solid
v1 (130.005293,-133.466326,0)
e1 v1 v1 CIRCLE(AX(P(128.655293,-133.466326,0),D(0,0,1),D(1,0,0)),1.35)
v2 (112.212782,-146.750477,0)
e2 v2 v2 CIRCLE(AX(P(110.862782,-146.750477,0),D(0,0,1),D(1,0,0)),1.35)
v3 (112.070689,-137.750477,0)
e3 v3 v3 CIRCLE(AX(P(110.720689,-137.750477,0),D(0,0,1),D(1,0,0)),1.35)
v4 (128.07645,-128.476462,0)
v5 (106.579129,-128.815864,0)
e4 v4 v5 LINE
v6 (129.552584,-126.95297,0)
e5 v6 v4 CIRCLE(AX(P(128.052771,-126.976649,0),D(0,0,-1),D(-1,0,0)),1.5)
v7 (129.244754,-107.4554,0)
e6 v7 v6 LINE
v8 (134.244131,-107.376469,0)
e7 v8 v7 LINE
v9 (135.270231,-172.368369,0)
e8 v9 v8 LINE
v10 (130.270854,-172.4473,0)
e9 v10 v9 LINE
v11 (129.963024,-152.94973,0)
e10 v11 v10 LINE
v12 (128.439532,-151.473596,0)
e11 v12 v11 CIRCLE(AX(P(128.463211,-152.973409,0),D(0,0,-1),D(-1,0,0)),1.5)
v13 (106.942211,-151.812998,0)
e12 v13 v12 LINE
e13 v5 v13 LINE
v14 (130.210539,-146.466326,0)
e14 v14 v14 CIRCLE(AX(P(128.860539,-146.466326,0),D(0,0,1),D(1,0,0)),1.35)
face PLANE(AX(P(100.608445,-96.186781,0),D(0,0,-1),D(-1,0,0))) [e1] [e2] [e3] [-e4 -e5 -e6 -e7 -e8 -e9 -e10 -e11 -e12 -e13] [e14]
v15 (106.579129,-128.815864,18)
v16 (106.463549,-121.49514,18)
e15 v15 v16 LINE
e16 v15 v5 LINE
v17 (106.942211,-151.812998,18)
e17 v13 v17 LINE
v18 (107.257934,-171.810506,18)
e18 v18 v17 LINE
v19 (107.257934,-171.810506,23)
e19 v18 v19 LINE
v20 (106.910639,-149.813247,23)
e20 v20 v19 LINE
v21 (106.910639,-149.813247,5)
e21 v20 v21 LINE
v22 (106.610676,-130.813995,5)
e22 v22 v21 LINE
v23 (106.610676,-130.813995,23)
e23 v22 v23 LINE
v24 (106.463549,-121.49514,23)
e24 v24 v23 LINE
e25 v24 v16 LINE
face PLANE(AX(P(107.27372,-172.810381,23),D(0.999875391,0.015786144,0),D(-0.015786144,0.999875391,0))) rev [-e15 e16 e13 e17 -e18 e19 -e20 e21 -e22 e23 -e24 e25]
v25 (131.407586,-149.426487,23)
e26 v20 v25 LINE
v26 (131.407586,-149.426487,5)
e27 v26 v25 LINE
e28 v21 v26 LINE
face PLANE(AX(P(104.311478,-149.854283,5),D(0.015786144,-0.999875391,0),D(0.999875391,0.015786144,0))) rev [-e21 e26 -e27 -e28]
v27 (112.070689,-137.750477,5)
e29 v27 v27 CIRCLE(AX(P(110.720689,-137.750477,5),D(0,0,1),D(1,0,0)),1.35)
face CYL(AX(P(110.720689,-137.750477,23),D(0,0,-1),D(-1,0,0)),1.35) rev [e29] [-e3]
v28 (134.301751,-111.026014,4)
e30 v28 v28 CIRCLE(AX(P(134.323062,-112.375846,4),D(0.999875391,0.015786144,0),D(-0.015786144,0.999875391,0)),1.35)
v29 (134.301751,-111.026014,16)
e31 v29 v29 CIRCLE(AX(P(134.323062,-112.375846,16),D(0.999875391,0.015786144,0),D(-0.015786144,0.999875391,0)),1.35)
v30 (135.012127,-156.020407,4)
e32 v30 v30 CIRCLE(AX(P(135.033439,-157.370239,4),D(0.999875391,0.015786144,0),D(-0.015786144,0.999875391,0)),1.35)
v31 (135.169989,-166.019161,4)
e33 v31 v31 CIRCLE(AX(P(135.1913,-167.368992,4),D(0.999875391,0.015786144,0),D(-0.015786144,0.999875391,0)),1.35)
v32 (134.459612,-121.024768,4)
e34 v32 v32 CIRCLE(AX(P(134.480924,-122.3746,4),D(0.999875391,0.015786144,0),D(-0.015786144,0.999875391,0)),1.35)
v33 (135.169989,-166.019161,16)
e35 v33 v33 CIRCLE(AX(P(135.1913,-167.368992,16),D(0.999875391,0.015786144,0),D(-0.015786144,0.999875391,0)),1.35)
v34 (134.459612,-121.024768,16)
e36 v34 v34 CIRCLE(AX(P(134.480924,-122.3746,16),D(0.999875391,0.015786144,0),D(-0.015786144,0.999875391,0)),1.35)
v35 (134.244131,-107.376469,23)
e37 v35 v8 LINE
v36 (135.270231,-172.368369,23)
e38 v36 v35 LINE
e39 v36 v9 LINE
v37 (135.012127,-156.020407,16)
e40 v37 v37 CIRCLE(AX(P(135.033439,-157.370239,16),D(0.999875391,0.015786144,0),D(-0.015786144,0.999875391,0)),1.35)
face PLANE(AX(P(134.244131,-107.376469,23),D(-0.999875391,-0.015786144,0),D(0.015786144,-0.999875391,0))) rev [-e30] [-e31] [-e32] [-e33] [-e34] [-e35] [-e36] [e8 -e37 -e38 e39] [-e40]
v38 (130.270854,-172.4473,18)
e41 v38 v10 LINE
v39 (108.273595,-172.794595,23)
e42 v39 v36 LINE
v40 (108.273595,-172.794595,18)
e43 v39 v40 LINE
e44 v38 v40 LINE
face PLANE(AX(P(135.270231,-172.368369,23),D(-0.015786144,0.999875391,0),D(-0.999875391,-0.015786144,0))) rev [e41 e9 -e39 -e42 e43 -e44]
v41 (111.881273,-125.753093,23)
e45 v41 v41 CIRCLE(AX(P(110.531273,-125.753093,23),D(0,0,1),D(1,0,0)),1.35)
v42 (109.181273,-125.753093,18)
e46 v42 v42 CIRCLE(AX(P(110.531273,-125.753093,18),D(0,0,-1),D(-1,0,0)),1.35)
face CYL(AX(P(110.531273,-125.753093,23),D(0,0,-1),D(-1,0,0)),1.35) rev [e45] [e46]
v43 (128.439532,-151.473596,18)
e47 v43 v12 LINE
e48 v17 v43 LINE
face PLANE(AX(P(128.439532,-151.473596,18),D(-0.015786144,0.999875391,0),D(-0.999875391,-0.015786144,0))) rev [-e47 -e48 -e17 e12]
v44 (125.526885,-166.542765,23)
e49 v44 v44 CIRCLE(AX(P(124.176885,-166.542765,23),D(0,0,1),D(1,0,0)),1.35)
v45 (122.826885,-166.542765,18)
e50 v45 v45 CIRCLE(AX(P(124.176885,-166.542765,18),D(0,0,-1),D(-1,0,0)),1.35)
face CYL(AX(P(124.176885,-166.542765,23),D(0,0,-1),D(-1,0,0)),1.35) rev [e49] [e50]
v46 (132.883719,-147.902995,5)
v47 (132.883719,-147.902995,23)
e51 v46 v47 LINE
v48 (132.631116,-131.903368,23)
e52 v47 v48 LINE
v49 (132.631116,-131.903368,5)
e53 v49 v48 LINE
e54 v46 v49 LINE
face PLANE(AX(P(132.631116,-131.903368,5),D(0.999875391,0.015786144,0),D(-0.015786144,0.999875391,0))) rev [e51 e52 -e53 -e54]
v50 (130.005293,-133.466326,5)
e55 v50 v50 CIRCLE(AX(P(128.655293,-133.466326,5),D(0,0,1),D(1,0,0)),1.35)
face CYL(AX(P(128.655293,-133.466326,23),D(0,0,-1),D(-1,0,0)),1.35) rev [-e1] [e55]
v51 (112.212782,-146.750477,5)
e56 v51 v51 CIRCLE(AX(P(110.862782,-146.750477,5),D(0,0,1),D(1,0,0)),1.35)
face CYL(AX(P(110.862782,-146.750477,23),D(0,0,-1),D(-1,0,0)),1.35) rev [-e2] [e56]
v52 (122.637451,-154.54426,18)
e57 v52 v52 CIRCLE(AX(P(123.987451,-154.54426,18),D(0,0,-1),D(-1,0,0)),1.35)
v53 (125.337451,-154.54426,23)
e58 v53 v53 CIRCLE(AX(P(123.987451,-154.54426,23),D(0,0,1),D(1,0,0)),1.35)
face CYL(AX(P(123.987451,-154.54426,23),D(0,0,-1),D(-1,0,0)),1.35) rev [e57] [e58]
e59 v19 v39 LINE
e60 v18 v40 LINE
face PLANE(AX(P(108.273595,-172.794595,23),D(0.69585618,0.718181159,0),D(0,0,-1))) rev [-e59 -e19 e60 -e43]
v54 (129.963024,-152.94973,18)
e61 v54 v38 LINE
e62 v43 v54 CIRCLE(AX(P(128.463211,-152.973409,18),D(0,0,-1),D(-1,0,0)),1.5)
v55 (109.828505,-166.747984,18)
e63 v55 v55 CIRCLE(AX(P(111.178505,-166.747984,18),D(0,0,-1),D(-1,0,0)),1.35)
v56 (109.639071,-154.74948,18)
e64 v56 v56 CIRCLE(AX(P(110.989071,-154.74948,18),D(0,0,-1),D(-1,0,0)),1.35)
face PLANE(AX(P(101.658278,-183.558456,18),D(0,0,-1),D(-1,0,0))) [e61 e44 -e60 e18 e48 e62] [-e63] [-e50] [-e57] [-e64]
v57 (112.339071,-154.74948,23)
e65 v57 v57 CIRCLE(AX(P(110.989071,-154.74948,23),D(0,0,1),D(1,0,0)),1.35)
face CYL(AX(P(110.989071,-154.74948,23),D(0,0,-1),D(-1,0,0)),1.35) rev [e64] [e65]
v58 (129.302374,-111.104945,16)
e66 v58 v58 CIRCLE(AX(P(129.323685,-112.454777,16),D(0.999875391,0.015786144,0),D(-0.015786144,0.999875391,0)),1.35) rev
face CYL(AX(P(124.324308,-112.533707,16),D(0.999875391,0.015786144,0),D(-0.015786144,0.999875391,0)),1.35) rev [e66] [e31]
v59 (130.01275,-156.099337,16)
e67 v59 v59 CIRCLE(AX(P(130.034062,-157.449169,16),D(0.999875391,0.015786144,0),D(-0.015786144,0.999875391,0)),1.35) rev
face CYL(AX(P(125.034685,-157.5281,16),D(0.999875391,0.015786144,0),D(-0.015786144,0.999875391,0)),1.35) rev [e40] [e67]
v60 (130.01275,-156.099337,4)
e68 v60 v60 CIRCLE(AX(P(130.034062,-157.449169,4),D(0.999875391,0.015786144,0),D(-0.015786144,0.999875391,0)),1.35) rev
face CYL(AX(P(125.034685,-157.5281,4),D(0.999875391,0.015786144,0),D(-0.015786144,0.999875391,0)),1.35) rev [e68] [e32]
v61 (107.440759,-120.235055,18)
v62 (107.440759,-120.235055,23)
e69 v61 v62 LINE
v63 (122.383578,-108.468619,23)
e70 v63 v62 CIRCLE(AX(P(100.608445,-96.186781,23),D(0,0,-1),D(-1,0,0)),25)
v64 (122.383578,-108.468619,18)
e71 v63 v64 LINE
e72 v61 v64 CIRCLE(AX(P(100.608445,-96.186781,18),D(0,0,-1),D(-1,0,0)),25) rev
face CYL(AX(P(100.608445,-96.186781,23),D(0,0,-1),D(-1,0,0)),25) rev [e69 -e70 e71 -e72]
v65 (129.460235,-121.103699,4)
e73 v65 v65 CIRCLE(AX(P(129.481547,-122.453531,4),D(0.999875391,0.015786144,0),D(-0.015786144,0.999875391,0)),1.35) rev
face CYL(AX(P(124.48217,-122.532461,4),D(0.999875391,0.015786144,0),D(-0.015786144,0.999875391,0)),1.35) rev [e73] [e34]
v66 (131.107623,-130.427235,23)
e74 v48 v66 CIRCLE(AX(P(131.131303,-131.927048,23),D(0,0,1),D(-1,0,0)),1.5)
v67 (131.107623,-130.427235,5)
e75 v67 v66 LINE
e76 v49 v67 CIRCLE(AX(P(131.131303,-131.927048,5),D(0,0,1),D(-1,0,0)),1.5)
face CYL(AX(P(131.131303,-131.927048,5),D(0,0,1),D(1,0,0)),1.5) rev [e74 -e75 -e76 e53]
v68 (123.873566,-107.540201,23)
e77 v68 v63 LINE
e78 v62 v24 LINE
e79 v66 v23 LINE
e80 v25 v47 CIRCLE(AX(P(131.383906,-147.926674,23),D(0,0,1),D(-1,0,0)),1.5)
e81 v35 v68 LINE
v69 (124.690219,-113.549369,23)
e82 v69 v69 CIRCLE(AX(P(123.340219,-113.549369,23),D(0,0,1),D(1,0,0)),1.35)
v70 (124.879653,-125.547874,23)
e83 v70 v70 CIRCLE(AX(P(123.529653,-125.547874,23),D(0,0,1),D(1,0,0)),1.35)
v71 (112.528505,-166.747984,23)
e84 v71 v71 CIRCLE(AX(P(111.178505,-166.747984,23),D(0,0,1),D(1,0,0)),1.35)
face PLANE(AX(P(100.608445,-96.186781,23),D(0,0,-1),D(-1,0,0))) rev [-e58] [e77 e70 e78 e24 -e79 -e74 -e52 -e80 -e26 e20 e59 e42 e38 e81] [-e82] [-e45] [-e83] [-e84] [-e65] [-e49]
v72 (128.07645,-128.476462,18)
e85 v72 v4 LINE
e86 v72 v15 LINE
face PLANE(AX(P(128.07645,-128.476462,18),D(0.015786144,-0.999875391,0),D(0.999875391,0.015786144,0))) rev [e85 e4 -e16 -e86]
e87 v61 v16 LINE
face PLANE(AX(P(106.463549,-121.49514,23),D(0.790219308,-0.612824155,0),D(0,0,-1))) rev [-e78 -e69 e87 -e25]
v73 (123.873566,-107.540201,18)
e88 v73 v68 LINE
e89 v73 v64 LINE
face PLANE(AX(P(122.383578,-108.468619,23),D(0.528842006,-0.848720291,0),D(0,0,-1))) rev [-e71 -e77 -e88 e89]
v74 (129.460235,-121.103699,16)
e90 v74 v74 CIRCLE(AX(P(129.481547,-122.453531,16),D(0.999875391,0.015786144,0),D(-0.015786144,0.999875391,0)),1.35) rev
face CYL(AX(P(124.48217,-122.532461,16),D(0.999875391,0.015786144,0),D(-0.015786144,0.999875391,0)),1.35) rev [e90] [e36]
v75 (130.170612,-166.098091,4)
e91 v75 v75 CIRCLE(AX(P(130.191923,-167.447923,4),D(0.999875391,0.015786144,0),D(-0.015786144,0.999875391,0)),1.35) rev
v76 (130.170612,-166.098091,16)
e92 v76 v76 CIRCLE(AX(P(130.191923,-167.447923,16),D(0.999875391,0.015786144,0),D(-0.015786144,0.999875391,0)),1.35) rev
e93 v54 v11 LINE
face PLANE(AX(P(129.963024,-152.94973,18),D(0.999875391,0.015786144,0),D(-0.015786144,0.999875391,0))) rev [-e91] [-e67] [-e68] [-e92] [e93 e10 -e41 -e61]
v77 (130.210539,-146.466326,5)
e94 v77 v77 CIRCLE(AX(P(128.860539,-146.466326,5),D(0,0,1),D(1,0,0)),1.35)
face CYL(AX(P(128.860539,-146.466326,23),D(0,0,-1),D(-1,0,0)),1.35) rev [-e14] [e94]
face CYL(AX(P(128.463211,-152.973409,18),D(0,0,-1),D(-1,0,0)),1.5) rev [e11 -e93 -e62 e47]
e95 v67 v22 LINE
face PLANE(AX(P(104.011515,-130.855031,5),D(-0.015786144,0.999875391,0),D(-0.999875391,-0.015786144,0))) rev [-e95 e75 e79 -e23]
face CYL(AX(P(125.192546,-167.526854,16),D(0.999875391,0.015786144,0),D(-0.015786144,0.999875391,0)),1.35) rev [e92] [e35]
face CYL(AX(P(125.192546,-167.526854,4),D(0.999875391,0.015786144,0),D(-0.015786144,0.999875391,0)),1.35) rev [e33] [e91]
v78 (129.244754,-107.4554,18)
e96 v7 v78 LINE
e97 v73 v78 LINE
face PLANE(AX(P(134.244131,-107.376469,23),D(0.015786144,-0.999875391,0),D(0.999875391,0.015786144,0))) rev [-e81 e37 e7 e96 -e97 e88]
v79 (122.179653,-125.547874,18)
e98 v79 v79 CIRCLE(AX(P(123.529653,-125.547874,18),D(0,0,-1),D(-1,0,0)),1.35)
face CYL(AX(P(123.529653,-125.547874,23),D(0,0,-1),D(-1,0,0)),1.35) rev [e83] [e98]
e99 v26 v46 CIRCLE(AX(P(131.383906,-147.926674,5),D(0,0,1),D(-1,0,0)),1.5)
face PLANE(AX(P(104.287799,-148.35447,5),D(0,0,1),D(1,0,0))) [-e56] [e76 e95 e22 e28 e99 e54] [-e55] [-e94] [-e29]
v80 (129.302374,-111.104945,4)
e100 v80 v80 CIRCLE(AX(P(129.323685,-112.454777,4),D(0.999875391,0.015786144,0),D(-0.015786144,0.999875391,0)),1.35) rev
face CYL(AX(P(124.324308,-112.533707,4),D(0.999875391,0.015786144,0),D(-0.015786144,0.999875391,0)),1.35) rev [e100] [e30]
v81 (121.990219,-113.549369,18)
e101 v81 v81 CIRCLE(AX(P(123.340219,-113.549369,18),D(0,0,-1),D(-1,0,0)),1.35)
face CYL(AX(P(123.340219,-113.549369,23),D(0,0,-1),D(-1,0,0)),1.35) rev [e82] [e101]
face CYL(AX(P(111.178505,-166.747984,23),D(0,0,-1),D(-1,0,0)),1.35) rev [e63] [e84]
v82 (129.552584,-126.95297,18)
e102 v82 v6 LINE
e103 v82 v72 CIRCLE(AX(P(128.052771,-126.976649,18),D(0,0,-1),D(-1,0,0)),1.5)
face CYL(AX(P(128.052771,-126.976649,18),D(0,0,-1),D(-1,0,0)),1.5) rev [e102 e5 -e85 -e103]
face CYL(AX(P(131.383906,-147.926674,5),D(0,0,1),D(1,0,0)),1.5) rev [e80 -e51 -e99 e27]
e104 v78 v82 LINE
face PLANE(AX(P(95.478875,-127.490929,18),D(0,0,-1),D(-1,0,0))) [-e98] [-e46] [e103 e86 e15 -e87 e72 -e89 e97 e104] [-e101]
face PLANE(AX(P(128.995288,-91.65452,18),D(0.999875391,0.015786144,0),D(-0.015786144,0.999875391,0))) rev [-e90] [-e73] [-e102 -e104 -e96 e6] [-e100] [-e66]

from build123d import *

# Parameters (mm, degrees)
SKETCH1_R          = 1.35
EXTRUDE1_DEPTH     = 23
SKETCH2_R          = 1.35
CUT_EXTRUDE1_DEPTH = 10
CHAMFER3_SIZE      = 1
EXTRUDE2_DEPTH     = 18
EXTRUDE3_DEPTH     = 18


with BuildPart() as part:
    # Sketch1 → Extrude1 (new body)
    with BuildSketch(Plane.XY):
        with BuildLine():
            Line((134.244131426, -107.376468954), (135.270230766, -172.368369374))
            Line((135.270230766, -172.368369374), (107.273719816, -172.810381397))
            Line((107.273719816, -172.810381397), (106.44776294, -120.495264366))
            ThreePointArc((106.44776294, -120.495264366), (116.078507859, -115.825445612), (122.873690334, -107.555986741))
            Line((122.873690334, -107.555986741), (134.244131426, -107.376468954))
        make_face()
        with Locations((110.720688645, -137.750476655)):
            Circle(SKETCH1_R, mode=Mode.SUBTRACT)
        with Locations((111.178504518, -166.747984476)):
            Circle(SKETCH1_R, mode=Mode.SUBTRACT)
        with Locations((124.176884602, -166.542764608)):
            Circle(SKETCH1_R, mode=Mode.SUBTRACT)
        with Locations((123.987450878, -154.544259915)):
            Circle(SKETCH1_R, mode=Mode.SUBTRACT)
        with Locations((110.989070794, -154.749479783)):
            Circle(SKETCH1_R, mode=Mode.SUBTRACT)
        with Locations((123.529652711, -125.547873574)):
            Circle(SKETCH1_R, mode=Mode.SUBTRACT)
        with Locations((110.531272627, -125.753093442)):
            Circle(SKETCH1_R, mode=Mode.SUBTRACT)
        with Locations((123.340218986, -113.549368881)):
            Circle(SKETCH1_R, mode=Mode.SUBTRACT)
        with Locations((128.65529324, -133.466326068)):
            Circle(SKETCH1_R, mode=Mode.SUBTRACT)
        with Locations((110.862781644, -146.750476655)):
            Circle(SKETCH1_R, mode=Mode.SUBTRACT)
        with Locations((128.860538683, -146.466326068)):
            Circle(SKETCH1_R, mode=Mode.SUBTRACT)
    extrude(amount=EXTRUDE1_DEPTH)

    # Sketch2 → Cut-Extrude1 (cut)
    with BuildSketch(Plane(origin=(132.515828327, 2.092174611, 0), x_dir=(0, 0, -1), z_dir=(0.9998753910699589, 0.01578614369301875, 0))):
        with Locations(Location((-16, -114.482286036, 0), (0, 0, 90))):
            Circle(SKETCH2_R)
        with Locations(Location((-4, -114.482286036, 0), (0, 0, 90))):
            Circle(SKETCH2_R)
        with Locations(Location((-16, -124.482286036, 0), (0, 0, 90))):
            Circle(SKETCH2_R)
        with Locations(Location((-4, -124.482286036, 0), (0, 0, 90))):
            Circle(SKETCH2_R)
        with Locations(Location((-16, -169.482286036, 0), (0, 0, 90))):
            Circle(SKETCH2_R)
        with Locations(Location((-4, -169.482286036, 0), (0, 0, 90))):
            Circle(SKETCH2_R)
        with Locations(Location((-16, -159.482286036, 0), (0, 0, 90))):
            Circle(SKETCH2_R)
        with Locations(Location((-4, -159.482286036, 0), (0, 0, 90))):
            Circle(SKETCH2_R)
    extrude(amount=-CUT_EXTRUDE1_DEPTH, mode=Mode.SUBTRACT)

    # Chamfer3
    # the kernel refuses this chamfer: 1 mm, written as the material it takes off along each edge
    with BuildSketch(Plane(origin=(107.273719816, -172.810381397, -2.571682988), x_dir=(-0.01578614369302038, 0.9998753910699589, 0), z_dir=(0, 0, 1))) as chamfer3_piece_1:
        Polygon((CHAMFER3_SIZE, 0), (0, -CHAMFER3_SIZE), (0, 0), align=None)
    extrude(amount=28.143365976, mode=Mode.SUBTRACT)
    with BuildSketch(Plane(origin=(106.44776294, -120.495264366, -2.646322056), x_dir=(0.9673390331642948, 0.2534860842665082, 0), z_dir=(0, 0, 1))) as chamfer3_piece_2:
        with BuildLine():
            Line((1.026523691, 0), (-CHAMFER3_SIZE * 0.238183944659, -CHAMFER3_SIZE * 0.971220061833))
            Line((-CHAMFER3_SIZE * 0.238183944659, -CHAMFER3_SIZE * 0.971220061833), (0, 0))
            ThreePointArc((0, 0), (0.529135289, -0.00526427), (1.026523691, 0))
        make_face()
    extrude(amount=28.292644112, mode=Mode.SUBTRACT)
    with BuildSketch(Plane(origin=(122.873690334, -107.555986741, -2.676981296), x_dir=(0.9998753910699592, 0.015786143693006172, 0), z_dir=(0, 0, 1))) as chamfer3_piece_3:
        with BuildLine():
            Line((CHAMFER3_SIZE, 0), (-0.504457815, -0.904781971))
            ThreePointArc((-0.504457815, -0.904781971), (-0.256001011, -0.470163527), (0, 0))
            Line((0, 0), (CHAMFER3_SIZE, 0))
        make_face()
    extrude(amount=28.353962591, mode=Mode.SUBTRACT)

    # Sketch3 → Extrude2 (cut)
    with BuildSketch(Plane.XY.offset(23)):
        with BuildLine():
            Line((104.011515413, -130.855030895), (131.107623287, -130.427234536))
            ThreePointArc((131.107623287, -130.427234536), (132.175086772, -130.849775884), (132.631115589, -131.903368407))
            Line((132.631115589, -131.903368407), (132.883719463, -147.90299458))
            ThreePointArc((132.883719463, -147.90299458), (132.461178115, -148.970458066), (131.407585592, -149.426486882))
            Line((131.407585592, -149.426486882), (104.311477719, -149.854283242))
            ThreePointArc((104.311477719, -149.854283242), (103.244014233, -149.431741893), (102.787985417, -148.378149371))
            Line((102.787985417, -148.378149371), (102.535381542, -132.378523198))
            ThreePointArc((102.535381542, -132.378523198), (102.957922891, -131.311059712), (104.011515413, -130.855030895))
        make_face()
    extrude(amount=-EXTRUDE2_DEPTH, mode=Mode.SUBTRACT)

    # Sketch4 → Extrude3 (cut)
    with BuildSketch(Plane(origin=(0, 0, 0), x_dir=(-1, 0, 0), z_dir=(0, 0, -1))):
        with BuildLine():
            Line((-128.995288436, -91.654520496), (-129.552584273, -126.952969799))
            ThreePointArc((-129.552584273, -126.952969799), (-129.130042924, -128.020433284), (-128.076450401, -128.476462101))
            Line((-128.076450401, -128.476462101), (-95.502554389, -128.990742388))
            ThreePointArc((-95.502554389, -128.990742388), (-94.435090904, -128.568201039), (-93.979062087, -127.514608517))
            Line((-93.979062087, -127.514608517), (-93.42176625, -92.216159214))
            ThreePointArc((-93.42176625, -92.216159214), (-93.844307599, -91.148695728), (-94.897900122, -90.692666912))
            Line((-94.897900122, -90.692666912), (-127.471796134, -90.178386625))
            ThreePointArc((-127.471796134, -90.178386625), (-128.539259619, -90.600927973), (-128.995288436, -91.654520496))
        make_face()
        with BuildLine():
            Line((-129.963024009, -152.949729966), (-130.439103933, -183.104060885))
            ThreePointArc((-130.439103933, -183.104060885), (-130.016562585, -184.17152437), (-128.962970062, -184.627553187))
            Line((-128.962970062, -184.627553187), (-101.681956846, -185.058268853))
            ThreePointArc((-101.681956846, -185.058268853), (-100.61449336, -184.635727504), (-100.158464544, -183.582134982))
            Line((-100.158464544, -183.582134982), (-99.682384619, -153.427804063))
            ThreePointArc((-99.682384619, -153.427804063), (-100.104925968, -152.360340578), (-101.15851849, -151.904311761))
            Line((-101.15851849, -151.904311761), (-128.439531706, -151.473596095))
            ThreePointArc((-128.439531706, -151.473596095), (-129.506995192, -151.896137444), (-129.963024009, -152.949729966))
        make_face()
    extrude(amount=-EXTRUDE3_DEPTH, mode=Mode.SUBTRACT)


solid = part.part
